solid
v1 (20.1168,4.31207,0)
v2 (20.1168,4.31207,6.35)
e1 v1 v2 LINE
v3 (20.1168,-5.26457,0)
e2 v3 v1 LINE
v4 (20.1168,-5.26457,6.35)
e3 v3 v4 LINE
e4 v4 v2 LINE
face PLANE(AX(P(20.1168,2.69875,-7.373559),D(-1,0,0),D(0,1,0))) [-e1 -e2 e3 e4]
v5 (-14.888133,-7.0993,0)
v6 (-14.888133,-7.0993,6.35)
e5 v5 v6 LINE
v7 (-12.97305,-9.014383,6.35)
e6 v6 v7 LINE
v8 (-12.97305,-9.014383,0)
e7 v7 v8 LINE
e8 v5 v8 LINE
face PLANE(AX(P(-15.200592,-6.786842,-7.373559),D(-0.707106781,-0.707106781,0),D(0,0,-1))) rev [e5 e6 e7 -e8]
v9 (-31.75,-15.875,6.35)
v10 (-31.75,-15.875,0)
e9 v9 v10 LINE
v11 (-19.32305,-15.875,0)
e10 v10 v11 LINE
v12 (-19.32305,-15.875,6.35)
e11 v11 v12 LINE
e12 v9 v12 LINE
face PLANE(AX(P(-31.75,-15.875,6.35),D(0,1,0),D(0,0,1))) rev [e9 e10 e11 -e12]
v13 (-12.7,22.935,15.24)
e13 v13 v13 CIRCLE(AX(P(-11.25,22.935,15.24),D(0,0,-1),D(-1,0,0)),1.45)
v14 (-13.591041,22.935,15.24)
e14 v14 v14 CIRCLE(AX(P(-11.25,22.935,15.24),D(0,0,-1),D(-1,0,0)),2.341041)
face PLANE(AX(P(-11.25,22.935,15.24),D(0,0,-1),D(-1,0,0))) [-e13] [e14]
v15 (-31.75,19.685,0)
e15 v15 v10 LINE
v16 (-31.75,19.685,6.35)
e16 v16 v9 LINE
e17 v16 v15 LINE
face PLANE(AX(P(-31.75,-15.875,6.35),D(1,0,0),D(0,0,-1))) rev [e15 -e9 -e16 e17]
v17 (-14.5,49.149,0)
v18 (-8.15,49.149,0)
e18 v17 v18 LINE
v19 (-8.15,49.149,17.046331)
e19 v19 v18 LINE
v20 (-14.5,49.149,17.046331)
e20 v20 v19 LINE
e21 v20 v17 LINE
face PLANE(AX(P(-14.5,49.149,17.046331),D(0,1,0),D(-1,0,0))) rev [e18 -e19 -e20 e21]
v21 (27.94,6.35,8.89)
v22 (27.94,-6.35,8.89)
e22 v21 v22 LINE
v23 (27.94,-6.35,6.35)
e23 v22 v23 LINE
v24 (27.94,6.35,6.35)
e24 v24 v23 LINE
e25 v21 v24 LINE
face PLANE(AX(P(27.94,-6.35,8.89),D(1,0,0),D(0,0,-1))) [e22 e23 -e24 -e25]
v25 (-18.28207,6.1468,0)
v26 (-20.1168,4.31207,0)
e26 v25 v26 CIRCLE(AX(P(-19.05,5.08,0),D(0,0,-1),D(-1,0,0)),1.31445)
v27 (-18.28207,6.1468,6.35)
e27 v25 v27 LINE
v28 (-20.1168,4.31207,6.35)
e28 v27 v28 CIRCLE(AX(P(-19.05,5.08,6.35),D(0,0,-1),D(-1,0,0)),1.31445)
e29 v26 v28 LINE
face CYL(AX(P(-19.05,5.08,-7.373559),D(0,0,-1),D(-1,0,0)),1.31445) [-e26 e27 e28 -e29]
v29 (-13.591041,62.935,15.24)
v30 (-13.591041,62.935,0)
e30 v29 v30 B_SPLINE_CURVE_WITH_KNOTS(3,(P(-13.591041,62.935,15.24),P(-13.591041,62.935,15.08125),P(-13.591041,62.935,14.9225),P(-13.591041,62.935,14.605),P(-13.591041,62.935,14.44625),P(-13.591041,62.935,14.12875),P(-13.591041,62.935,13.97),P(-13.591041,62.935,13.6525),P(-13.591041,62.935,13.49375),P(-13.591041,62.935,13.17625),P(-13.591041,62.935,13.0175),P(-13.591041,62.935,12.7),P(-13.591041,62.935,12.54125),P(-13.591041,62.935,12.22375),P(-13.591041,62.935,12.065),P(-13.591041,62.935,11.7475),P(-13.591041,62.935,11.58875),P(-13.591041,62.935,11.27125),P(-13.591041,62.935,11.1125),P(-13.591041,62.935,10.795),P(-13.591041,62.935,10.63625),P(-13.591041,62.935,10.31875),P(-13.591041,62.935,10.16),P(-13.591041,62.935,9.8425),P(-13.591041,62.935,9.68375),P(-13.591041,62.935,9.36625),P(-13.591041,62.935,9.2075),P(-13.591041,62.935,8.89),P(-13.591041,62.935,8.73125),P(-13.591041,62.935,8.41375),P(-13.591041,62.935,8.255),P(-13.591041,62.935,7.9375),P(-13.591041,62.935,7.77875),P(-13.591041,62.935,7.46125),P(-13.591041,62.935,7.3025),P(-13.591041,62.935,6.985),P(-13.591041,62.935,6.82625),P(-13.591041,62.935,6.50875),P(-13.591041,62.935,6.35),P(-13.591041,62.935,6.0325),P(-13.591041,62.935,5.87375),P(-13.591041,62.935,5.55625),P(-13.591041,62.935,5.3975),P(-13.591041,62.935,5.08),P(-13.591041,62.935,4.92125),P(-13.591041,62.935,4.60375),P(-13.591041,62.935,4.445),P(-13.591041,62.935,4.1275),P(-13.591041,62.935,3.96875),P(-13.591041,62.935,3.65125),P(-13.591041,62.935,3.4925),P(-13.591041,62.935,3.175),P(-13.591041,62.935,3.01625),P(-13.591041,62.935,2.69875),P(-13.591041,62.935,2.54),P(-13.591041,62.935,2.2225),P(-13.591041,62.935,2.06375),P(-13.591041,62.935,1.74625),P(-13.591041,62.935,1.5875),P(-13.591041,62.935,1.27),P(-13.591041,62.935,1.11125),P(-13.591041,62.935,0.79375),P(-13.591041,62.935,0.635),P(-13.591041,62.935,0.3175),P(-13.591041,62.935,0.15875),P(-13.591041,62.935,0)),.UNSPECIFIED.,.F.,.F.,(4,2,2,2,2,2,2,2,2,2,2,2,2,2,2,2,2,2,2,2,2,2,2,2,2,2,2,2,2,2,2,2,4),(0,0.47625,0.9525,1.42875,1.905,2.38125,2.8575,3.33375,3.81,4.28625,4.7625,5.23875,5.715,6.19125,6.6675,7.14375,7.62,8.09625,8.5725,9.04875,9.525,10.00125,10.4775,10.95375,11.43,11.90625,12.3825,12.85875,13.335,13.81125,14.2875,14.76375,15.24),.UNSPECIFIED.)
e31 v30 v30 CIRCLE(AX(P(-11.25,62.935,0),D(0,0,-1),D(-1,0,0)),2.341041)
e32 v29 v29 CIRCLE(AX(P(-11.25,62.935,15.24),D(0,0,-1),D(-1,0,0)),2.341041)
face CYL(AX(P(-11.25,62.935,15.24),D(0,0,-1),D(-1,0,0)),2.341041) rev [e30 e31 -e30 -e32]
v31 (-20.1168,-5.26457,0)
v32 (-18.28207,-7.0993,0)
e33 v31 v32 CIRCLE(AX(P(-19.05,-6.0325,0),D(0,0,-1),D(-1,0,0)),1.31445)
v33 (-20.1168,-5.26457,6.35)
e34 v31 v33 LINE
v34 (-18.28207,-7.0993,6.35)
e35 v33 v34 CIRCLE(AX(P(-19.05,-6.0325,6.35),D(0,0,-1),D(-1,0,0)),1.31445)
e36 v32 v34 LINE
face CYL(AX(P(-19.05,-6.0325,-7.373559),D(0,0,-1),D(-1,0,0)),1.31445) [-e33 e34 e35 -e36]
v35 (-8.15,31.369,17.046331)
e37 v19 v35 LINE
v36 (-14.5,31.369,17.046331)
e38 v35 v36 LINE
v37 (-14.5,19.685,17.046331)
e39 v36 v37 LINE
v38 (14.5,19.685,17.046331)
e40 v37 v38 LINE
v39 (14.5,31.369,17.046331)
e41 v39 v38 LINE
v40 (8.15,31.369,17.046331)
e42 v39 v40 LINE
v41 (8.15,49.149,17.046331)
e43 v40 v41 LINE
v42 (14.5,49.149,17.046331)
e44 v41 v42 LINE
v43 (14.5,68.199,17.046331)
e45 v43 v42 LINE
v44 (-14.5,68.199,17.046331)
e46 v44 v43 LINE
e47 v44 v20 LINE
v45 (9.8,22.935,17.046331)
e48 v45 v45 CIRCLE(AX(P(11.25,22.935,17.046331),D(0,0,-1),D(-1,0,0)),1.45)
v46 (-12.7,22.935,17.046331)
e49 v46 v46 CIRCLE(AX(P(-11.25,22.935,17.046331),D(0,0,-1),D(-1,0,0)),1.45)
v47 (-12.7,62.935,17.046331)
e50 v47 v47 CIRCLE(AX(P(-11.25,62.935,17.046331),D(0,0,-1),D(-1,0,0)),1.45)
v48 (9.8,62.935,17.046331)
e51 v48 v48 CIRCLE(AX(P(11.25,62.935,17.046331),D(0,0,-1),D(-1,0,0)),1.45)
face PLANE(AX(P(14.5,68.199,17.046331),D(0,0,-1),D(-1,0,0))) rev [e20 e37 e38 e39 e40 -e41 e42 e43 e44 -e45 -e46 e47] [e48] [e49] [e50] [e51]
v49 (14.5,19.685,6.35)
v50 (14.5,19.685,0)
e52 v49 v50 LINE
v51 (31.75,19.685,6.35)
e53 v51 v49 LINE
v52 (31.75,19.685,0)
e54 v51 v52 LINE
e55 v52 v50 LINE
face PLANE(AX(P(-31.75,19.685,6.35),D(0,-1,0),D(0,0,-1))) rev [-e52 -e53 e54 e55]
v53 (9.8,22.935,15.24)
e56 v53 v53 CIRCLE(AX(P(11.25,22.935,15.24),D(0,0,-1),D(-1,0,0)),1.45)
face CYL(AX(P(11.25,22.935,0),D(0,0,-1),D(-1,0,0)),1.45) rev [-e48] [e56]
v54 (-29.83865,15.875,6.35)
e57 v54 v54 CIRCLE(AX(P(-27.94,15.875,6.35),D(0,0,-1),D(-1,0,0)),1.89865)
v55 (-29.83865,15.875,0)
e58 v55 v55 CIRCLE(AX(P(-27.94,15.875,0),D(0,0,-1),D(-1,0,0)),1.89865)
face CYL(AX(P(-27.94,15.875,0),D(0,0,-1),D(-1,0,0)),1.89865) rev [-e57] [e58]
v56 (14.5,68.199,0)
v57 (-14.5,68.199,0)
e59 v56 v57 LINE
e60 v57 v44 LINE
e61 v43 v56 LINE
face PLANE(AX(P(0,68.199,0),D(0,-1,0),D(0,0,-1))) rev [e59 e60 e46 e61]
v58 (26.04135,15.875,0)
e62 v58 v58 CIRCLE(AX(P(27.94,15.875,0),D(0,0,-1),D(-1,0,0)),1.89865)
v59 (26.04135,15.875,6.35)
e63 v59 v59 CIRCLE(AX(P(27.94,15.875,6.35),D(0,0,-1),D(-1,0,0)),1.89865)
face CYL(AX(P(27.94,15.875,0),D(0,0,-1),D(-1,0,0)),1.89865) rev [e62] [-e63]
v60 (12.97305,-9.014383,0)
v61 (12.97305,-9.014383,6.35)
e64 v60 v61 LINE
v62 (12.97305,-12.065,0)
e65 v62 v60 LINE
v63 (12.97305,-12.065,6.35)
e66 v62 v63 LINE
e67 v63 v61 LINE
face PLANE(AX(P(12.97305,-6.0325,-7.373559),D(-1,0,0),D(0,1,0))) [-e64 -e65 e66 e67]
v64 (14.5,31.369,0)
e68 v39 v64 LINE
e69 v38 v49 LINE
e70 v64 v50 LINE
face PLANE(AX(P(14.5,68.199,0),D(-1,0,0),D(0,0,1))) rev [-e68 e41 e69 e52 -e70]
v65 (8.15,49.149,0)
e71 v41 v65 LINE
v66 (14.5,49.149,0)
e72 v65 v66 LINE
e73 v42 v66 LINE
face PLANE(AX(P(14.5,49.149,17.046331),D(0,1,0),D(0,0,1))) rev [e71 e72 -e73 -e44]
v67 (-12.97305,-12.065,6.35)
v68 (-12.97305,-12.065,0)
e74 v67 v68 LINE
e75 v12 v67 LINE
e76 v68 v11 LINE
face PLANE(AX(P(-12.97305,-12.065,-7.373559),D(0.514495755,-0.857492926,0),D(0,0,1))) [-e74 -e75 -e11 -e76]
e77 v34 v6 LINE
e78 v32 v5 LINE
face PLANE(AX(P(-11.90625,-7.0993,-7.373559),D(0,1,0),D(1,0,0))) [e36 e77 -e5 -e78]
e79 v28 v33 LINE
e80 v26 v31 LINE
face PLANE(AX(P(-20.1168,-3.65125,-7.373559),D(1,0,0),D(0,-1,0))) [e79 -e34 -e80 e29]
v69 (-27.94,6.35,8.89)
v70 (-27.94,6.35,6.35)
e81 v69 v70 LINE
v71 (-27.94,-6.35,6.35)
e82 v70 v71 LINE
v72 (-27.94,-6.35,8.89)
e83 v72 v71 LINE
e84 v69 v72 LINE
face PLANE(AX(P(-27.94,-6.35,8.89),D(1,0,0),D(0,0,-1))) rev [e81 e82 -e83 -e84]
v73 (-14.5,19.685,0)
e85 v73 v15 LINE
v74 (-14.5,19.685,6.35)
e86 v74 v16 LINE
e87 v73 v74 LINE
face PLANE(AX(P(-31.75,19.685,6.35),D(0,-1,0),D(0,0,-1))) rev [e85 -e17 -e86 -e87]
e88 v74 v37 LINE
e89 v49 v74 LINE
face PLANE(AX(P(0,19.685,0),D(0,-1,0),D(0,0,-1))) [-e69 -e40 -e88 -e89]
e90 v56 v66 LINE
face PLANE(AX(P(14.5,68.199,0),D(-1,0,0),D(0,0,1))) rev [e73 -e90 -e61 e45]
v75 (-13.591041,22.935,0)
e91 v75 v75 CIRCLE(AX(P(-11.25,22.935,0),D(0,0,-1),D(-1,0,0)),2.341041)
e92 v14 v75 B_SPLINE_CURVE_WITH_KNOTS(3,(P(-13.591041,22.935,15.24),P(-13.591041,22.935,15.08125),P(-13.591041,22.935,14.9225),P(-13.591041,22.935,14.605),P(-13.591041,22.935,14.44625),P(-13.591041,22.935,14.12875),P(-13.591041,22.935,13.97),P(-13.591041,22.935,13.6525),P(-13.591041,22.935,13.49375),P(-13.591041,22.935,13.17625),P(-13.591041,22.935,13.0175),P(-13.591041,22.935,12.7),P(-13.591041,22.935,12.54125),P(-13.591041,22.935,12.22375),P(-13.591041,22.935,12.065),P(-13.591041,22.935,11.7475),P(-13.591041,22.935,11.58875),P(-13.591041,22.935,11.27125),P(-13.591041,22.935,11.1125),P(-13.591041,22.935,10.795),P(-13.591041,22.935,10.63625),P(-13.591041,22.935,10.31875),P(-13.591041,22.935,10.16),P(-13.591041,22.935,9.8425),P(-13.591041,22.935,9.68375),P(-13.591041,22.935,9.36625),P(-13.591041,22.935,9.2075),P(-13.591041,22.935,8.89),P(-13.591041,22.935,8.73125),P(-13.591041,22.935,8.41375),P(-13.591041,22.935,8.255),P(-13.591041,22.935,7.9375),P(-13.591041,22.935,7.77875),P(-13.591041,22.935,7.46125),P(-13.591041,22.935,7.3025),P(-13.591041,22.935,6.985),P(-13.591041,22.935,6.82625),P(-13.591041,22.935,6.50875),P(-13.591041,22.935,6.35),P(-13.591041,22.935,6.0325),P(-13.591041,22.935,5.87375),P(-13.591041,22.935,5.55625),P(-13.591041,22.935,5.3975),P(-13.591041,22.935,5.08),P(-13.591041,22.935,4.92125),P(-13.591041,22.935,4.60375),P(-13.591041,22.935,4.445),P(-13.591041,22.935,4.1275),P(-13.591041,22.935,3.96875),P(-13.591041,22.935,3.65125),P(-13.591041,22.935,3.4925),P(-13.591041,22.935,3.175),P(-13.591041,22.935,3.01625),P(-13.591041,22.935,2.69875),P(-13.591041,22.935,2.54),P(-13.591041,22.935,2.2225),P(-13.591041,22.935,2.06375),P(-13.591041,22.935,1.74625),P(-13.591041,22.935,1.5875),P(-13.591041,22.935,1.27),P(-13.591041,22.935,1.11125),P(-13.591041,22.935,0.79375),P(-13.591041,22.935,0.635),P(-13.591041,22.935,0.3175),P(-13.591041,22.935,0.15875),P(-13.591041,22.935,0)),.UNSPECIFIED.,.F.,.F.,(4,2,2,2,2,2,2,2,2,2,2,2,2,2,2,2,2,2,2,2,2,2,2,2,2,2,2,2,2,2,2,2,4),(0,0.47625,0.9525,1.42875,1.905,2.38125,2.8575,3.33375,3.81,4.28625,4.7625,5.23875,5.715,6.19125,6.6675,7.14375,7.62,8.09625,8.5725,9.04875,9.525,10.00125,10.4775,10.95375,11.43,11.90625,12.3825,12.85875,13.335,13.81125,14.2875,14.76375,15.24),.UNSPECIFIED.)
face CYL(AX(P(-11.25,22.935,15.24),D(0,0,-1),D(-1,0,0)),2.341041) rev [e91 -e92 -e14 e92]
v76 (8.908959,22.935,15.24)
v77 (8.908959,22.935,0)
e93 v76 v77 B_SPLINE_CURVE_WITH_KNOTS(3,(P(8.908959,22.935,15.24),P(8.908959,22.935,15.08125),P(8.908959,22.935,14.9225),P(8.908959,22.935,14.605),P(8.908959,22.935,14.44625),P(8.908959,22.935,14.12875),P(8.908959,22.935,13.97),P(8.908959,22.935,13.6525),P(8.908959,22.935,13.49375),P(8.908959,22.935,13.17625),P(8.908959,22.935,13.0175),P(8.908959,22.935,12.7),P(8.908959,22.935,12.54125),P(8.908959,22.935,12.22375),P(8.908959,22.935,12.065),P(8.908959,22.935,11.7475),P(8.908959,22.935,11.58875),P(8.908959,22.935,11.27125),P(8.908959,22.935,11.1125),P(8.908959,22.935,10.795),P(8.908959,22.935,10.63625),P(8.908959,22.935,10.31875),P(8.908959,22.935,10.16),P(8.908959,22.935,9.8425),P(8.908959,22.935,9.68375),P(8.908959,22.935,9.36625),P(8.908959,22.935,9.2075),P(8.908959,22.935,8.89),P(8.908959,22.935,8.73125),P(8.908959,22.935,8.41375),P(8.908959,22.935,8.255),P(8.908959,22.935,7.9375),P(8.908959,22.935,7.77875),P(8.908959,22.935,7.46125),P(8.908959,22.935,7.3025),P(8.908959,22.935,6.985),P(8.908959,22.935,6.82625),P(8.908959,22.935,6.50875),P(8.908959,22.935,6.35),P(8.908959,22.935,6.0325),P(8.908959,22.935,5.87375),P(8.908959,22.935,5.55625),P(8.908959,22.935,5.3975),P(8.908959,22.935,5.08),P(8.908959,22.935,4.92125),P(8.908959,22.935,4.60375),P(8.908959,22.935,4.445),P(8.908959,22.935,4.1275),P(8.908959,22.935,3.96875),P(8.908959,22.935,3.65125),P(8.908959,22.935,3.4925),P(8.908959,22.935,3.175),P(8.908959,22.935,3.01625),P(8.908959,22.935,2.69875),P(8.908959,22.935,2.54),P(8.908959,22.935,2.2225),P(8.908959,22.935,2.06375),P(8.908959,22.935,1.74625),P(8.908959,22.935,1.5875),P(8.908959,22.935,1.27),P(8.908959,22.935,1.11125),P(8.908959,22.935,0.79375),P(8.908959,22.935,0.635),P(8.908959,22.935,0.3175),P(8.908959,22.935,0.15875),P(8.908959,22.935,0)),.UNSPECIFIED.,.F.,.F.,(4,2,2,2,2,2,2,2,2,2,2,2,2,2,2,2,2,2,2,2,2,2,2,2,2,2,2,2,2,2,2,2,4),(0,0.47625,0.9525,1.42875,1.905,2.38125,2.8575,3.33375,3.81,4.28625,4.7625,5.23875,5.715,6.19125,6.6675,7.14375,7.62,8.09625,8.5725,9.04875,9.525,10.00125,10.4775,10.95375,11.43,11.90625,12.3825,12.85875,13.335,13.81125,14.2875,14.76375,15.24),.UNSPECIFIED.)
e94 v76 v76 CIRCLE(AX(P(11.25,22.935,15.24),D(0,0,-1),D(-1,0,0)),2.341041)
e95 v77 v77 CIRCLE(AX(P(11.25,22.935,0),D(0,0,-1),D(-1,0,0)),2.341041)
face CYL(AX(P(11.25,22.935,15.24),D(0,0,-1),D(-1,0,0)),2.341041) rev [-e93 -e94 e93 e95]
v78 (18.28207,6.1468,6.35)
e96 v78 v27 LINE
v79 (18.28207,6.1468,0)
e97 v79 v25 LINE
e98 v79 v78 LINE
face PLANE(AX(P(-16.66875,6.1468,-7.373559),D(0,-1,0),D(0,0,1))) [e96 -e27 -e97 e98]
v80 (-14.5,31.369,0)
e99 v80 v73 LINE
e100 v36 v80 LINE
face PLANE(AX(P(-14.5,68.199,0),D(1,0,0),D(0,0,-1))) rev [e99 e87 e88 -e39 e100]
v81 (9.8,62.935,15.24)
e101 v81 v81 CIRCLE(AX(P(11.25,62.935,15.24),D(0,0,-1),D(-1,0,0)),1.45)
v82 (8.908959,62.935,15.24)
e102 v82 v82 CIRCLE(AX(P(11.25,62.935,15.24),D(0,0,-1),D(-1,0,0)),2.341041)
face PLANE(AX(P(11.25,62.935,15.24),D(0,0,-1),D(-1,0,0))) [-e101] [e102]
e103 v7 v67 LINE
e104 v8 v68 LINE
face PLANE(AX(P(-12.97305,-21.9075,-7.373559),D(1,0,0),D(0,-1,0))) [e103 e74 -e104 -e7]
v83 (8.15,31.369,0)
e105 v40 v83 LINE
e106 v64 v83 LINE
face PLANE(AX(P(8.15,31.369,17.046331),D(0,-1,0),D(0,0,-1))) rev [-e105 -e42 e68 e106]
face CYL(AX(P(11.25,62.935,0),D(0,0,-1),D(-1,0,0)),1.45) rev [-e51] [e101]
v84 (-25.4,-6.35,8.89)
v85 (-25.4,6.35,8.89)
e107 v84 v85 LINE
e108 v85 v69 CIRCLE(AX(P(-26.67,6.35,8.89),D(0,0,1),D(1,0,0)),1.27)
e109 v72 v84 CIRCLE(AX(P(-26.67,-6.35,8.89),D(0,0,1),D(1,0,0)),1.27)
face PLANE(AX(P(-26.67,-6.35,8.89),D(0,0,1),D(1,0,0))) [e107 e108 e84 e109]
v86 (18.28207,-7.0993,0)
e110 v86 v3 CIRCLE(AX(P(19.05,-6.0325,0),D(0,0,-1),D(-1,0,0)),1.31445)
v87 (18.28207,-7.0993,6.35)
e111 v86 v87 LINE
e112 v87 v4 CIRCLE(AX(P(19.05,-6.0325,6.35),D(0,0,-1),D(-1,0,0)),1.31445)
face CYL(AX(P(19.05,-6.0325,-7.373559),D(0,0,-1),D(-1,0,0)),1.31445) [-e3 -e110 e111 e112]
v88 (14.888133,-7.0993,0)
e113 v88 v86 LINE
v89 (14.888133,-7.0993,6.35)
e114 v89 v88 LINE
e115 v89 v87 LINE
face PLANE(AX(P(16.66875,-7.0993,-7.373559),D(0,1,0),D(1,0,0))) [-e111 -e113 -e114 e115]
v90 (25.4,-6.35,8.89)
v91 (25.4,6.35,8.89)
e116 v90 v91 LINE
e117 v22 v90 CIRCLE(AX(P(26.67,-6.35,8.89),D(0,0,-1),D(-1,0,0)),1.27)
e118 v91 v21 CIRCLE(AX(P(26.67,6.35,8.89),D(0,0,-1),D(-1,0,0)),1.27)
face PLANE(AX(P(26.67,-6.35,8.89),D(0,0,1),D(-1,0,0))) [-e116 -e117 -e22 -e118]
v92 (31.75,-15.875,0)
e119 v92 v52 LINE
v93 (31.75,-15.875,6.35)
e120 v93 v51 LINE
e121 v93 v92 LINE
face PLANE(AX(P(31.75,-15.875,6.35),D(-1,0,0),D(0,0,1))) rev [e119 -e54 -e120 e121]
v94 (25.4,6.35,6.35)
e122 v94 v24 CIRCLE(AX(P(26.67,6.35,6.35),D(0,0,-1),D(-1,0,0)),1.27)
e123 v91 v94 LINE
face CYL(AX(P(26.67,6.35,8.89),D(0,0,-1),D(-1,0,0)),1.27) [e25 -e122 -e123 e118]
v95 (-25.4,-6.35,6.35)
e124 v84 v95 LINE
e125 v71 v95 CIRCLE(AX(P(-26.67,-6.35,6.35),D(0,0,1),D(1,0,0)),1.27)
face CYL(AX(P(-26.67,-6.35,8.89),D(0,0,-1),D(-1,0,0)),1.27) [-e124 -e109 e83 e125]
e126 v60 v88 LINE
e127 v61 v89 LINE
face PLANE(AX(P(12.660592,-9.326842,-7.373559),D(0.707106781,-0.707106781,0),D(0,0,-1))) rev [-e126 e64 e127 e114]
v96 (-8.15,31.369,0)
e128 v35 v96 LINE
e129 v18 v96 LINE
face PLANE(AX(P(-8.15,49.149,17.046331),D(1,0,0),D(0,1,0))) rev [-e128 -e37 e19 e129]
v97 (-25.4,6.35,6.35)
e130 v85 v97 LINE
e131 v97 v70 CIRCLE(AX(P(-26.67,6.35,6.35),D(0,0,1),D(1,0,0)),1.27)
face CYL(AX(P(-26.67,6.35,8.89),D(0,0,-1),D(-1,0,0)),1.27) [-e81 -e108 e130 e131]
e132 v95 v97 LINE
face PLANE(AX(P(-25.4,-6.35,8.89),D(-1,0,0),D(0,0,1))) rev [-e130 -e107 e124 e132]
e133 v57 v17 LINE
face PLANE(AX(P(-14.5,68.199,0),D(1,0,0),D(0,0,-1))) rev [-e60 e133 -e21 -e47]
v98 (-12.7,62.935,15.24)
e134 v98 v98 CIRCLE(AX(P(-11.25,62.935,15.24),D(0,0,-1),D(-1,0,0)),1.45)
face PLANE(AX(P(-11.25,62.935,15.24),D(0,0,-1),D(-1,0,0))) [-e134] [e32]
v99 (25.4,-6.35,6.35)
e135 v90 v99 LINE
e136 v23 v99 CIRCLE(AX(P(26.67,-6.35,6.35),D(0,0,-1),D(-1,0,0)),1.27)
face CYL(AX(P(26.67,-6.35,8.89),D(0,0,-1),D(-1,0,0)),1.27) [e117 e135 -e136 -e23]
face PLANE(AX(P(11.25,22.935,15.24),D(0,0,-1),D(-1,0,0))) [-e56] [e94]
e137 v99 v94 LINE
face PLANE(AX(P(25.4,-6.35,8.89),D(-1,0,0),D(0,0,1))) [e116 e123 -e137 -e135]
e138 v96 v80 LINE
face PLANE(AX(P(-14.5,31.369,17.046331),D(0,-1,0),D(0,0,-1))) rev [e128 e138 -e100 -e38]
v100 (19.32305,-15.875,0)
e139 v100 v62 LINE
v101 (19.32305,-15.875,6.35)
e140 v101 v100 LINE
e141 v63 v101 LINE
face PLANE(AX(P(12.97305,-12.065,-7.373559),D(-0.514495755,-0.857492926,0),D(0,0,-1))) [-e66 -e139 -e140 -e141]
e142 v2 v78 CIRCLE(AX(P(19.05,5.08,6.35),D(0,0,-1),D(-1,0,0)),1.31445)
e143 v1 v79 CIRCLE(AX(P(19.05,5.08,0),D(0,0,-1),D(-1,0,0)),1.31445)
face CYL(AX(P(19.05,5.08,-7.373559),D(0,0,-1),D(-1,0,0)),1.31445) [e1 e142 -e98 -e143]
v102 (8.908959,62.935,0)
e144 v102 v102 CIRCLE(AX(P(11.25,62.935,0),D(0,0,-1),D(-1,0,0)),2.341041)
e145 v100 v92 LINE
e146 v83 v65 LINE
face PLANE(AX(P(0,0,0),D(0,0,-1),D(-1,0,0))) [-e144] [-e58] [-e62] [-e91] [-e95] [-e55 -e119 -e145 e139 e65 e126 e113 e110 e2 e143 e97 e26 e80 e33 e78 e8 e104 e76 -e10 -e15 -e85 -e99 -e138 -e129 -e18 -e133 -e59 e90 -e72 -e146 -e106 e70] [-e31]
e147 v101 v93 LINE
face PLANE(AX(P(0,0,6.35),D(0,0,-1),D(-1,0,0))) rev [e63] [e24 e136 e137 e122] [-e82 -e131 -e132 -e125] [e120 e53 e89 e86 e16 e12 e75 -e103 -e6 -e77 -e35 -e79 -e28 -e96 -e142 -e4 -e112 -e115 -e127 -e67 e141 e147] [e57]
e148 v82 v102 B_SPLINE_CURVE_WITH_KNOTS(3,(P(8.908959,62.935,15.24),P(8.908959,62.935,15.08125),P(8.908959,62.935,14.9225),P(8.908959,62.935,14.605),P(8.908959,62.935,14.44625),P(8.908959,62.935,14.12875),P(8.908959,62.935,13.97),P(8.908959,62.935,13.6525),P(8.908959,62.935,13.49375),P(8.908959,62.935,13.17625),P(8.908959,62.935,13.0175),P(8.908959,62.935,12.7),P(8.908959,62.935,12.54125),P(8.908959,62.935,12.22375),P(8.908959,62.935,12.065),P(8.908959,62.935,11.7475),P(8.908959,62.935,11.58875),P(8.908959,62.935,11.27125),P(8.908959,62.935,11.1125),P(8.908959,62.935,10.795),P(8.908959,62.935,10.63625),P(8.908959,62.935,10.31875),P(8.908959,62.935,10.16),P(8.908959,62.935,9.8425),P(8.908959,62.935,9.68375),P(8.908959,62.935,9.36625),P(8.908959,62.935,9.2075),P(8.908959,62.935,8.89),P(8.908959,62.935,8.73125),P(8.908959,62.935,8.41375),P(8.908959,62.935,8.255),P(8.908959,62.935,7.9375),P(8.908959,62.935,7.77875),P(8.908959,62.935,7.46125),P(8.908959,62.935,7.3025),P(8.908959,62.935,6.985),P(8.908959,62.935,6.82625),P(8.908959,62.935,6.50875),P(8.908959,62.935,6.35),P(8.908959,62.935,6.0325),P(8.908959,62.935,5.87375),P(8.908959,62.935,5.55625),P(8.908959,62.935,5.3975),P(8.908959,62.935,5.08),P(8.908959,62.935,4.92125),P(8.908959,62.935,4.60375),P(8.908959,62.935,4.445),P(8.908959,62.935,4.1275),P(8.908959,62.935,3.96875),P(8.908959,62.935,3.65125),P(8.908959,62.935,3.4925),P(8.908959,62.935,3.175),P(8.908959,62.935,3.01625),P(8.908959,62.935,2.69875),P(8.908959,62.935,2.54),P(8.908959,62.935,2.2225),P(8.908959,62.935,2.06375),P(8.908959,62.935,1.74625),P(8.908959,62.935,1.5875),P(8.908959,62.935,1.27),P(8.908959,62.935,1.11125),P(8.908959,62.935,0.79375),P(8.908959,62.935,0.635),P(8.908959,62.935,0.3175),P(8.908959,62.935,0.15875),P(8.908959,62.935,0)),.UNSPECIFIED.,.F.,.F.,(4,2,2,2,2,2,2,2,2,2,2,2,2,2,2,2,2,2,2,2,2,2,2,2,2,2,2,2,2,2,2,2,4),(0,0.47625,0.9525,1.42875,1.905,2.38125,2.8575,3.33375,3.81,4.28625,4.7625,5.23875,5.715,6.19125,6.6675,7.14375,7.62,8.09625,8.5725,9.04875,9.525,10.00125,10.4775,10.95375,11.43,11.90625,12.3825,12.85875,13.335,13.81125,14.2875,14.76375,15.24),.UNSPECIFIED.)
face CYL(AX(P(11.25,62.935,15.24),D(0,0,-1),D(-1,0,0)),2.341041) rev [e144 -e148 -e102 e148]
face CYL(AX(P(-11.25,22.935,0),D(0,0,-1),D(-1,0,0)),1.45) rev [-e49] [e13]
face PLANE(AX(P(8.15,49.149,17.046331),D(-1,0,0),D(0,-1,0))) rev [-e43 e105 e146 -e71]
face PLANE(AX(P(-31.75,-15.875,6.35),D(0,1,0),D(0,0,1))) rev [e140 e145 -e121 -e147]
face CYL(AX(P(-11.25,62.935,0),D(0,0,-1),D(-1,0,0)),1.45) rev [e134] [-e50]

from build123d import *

# Parameters (mm, degrees)
ESQUISSE1_W             = 63.5
ESQUISSE1_H             = 35.56
BOSS_EXTRU_1_DEPTH      = 6.35
BOSS_EXTRU_2_DEPTH      = 2.54
EMPREINTE1_DEPTH        = 6.35
D_PLACER_LA_FACE2_DEPTH = 6.35
CHANFREIN1_SIZE         = 6.35
CHANFREIN1_SIZE2        = 3.81
CHANFREIN2_SIZE         = 6.35
CHANFREIN2_SIZE2        = 3.81
ESQUISSE3_W             = 29
ESQUISSE3_H             = 17.046330794
BOSS_EXTRU_3_DEPTH      = 48.514
ESQUISSE4_R             = 2.341041465
ENL_V_MAT_EXTRU_1_DEPTH = 15.24
ESQUISSE5_R             = 1.397
ESQUISSE5_W             = 6.35
ESQUISSE5_H             = 17.78
ENL_V_MAT_EXTRU_2_DEPTH = 78.134580407
D_GAGEMENT_M2_51_D      = 2.9
D_GAGEMENT_61_D         = 3.7973


# Read off the part's stored shape, not the designer's step: Empreinte1, Déplacer la face2
with BuildPart() as part:
    # Esquisse1 → Boss.-Extru.1 (new body)
    with BuildSketch(Plane.XY):
        with Locations((0, 1.905)):
            Rectangle(ESQUISSE1_W, ESQUISSE1_H)
    extrude(amount=BOSS_EXTRU_1_DEPTH)

    # Esquisse2 → Boss.-Extru.2 (add)
    with BuildSketch(Plane.XY.offset(6.35)):
        with BuildLine():
            Line((-27.94, -6.35), (-27.94, 6.35))
            ThreePointArc((-27.94, 6.35), (-26.67, 7.62), (-25.4, 6.35))
            Line((-25.4, 6.35), (-25.4, -6.35))
            ThreePointArc((-25.4, -6.35), (-26.67, -7.62), (-27.94, -6.35))
        make_face()
    boss_extru_2 = extrude(amount=BOSS_EXTRU_2_DEPTH)

    # Symétrie1: Boss.-Extru.2 across plane
    add(boss_extru_2.mirror(Plane(origin=(0, 0, 0), x_dir=(0, 0, 1), z_dir=(1, 0, 0))))

    # Empreinte1 outline → Empreinte1 (cut)
    with BuildSketch(Plane.XY):
        with BuildLine():
            Line((-11.90625, -8.5725), (-11.90625, -15.875))
            Line((-11.90625, -15.875), (11.90625, -15.875))
            Line((11.90625, -15.875), (11.90625, -8.5725))
            Line((11.90625, -8.5725), (14.44625, -6.0325))
            Line((14.44625, -6.0325), (16.66875, -6.0325))
            ThreePointArc((16.66875, -6.0325), (17.366201977, -4.348701977), (19.05, -3.65125))
            Line((19.05, -3.65125), (19.05, 2.69875))
            ThreePointArc((19.05, 2.69875), (17.366201977, 3.396201977), (16.66875, 5.08))
            Line((16.66875, 5.08), (-16.66875, 5.08))
            ThreePointArc((-16.66875, 5.08), (-17.366201977, 3.396201977), (-19.05, 2.69875))
            Line((-19.05, 2.69875), (-19.05, -3.65125))
            ThreePointArc((-19.05, -3.65125), (-17.366201977, -4.348701977), (-16.66875, -6.0325))
            Line((-16.66875, -6.0325), (-14.44625, -6.0325))
            Line((-14.44625, -6.0325), (-11.90625, -8.5725))
        make_face()
    extrude(amount=EMPREINTE1_DEPTH, mode=Mode.SUBTRACT)

    # Déplacer la face2 outline → Déplacer la face2 (cut)
    with BuildSketch(Plane.XY):
        with BuildLine():
            Line((-12.97305, -9.014383028), (-12.97305, -15.875))
            Line((-12.97305, -15.875), (-11.90625, -15.875))
            Line((-11.90625, -15.875), (-11.90625, -8.5725))
            Line((-11.90625, -8.5725), (-14.44625, -6.0325))
            Line((-14.44625, -6.0325), (-16.66875, -6.0325))
            ThreePointArc((-16.66875, -6.0325), (-17.366201977, -4.348701977), (-19.05, -3.65125))
            Line((-19.05, -3.65125), (-19.05, 2.69875))
            ThreePointArc((-19.05, 2.69875), (-17.366201977, 3.396201977), (-16.66875, 5.08))
            Line((-16.66875, 5.08), (16.66875, 5.08))
            ThreePointArc((16.66875, 5.08), (17.366201977, 3.396201977), (19.05, 2.69875))
            Line((19.05, 2.69875), (19.05, -3.65125))
            ThreePointArc((19.05, -3.65125), (17.366201977, -4.348701977), (16.66875, -6.0325))
            Line((16.66875, -6.0325), (14.44625, -6.0325))
            Line((14.44625, -6.0325), (11.90625, -8.5725))
            Line((11.90625, -8.5725), (11.90625, -15.875))
            Line((11.90625, -15.875), (12.97305, -15.875))
            Line((12.97305, -15.875), (12.97305, -9.014383028))
            Line((12.97305, -9.014383028), (14.888133028, -7.0993))
            Line((14.888133028, -7.0993), (18.282069949, -7.0993))
            ThreePointArc((18.282069949, -7.0993), (18.120543491, -5.103043491), (20.1168, -5.264569949))
            Line((20.1168, -5.264569949), (20.1168, 4.312069949))
            ThreePointArc((20.1168, 4.312069949), (18.120543491, 4.150543491), (18.282069949, 6.1468))
            Line((18.282069949, 6.1468), (-18.282069949, 6.1468))
            ThreePointArc((-18.282069949, 6.1468), (-18.120543491, 4.150543491), (-20.1168, 4.312069949))
            Line((-20.1168, 4.312069949), (-20.1168, -5.264569949))
            ThreePointArc((-20.1168, -5.264569949), (-18.120543491, -5.103043491), (-18.282069949, -7.0993))
            Line((-18.282069949, -7.0993), (-14.888133028, -7.0993))
            Line((-14.888133028, -7.0993), (-12.97305, -9.014383028))
        make_face()
    extrude(amount=D_PLACER_LA_FACE2_DEPTH, mode=Mode.SUBTRACT)

    # Chanfrein1
    chanfrein1_edges = [part.edges().sort_by_distance(p)[0] for p in [
        (12.97305, -15.875, 3.175),
    ]]
    chanfrein1_side = [part.faces().sort_by_distance(p)[0] for p in [
        (22.361525, -15.875, 3.175),
    ]]
    chamfer(chanfrein1_edges, length=CHANFREIN1_SIZE, length2=CHANFREIN1_SIZE2, reference=chanfrein1_side[0])

    # Chanfrein2
    chanfrein2_edges = [part.edges().sort_by_distance(p)[0] for p in [
        (-12.97305, -15.875, 3.175),
    ]]
    chanfrein2_side = [part.faces().sort_by_distance(p)[0] for p in [
        (-22.361525, -15.875, 3.175),
    ]]
    chamfer(chanfrein2_edges, length=CHANFREIN2_SIZE, length2=CHANFREIN2_SIZE2, reference=chanfrein2_side[0])

    # Esquisse3 → Boss.-Extru.3 (add)
    with BuildSketch(Plane(origin=(0, 19.685, 0), x_dir=(1, 0, 0), z_dir=(0, 1, 0))):
        with Locations((0, -8.523165397)):
            Rectangle(ESQUISSE3_W, ESQUISSE3_H)
    extrude(amount=BOSS_EXTRU_3_DEPTH)

    # Esquisse4 → Enlèv. mat.-Extru.1 (cut)
    with BuildSketch(Plane(origin=(0, 0, 0), x_dir=(-1, 0, 0), z_dir=(0, 0, -1))):
        with Locations((-11.25, 62.935)):
            Circle(ESQUISSE4_R)
        with Locations((11.25, 62.935)):
            Circle(ESQUISSE4_R)
        with Locations((11.25, 22.935)):
            Circle(ESQUISSE4_R)
        with Locations((-11.25, 22.935)):
            Circle(ESQUISSE4_R)
    extrude(amount=-ENL_V_MAT_EXTRU_1_DEPTH, mode=Mode.SUBTRACT)

    # Esquisse5 → Enlèv. mat.-Extru.2 (cut, through all)
    with BuildSketch(Plane(origin=(0, 0, 0), x_dir=(-1, 0, 0), z_dir=(0, 0, -1))):
        with Locations((-11.25, 22.935)):
            Circle(ESQUISSE5_R)
        with Locations((-11.25, 62.935)):
            Circle(ESQUISSE5_R)
        with Locations((11.25, 62.935)):
            Circle(ESQUISSE5_R)
        with Locations((11.25, 22.935)):
            Circle(ESQUISSE5_R)
        with Locations((11.325, 40.259)):
            Rectangle(ESQUISSE5_W, ESQUISSE5_H)
        with Locations((-11.325, 40.259)):
            Rectangle(ESQUISSE5_W, ESQUISSE5_H)
    extrude(amount=-ENL_V_MAT_EXTRU_2_DEPTH, mode=Mode.SUBTRACT)

    # Dégagement M2.51 (through all)
    with Locations(Plane(origin=(0, 0, 0), x_dir=(-1, 0, 0), z_dir=(0, 0, -1))):
        with Locations((11.25, 62.935), (-11.25, 62.935), (11.25, 22.935), (-11.25, 22.935)):
            Hole(D_GAGEMENT_M2_51_D / 2)

    # Dégagement #61 (through all)
    with Locations(Plane(origin=(0, 0, 0), x_dir=(-1, 0, 0), z_dir=(0, 0, -1))):
        with Locations((-27.94, 15.875), (27.94, 15.875)):
            Hole(D_GAGEMENT_61_D / 2)


solid = part.part
